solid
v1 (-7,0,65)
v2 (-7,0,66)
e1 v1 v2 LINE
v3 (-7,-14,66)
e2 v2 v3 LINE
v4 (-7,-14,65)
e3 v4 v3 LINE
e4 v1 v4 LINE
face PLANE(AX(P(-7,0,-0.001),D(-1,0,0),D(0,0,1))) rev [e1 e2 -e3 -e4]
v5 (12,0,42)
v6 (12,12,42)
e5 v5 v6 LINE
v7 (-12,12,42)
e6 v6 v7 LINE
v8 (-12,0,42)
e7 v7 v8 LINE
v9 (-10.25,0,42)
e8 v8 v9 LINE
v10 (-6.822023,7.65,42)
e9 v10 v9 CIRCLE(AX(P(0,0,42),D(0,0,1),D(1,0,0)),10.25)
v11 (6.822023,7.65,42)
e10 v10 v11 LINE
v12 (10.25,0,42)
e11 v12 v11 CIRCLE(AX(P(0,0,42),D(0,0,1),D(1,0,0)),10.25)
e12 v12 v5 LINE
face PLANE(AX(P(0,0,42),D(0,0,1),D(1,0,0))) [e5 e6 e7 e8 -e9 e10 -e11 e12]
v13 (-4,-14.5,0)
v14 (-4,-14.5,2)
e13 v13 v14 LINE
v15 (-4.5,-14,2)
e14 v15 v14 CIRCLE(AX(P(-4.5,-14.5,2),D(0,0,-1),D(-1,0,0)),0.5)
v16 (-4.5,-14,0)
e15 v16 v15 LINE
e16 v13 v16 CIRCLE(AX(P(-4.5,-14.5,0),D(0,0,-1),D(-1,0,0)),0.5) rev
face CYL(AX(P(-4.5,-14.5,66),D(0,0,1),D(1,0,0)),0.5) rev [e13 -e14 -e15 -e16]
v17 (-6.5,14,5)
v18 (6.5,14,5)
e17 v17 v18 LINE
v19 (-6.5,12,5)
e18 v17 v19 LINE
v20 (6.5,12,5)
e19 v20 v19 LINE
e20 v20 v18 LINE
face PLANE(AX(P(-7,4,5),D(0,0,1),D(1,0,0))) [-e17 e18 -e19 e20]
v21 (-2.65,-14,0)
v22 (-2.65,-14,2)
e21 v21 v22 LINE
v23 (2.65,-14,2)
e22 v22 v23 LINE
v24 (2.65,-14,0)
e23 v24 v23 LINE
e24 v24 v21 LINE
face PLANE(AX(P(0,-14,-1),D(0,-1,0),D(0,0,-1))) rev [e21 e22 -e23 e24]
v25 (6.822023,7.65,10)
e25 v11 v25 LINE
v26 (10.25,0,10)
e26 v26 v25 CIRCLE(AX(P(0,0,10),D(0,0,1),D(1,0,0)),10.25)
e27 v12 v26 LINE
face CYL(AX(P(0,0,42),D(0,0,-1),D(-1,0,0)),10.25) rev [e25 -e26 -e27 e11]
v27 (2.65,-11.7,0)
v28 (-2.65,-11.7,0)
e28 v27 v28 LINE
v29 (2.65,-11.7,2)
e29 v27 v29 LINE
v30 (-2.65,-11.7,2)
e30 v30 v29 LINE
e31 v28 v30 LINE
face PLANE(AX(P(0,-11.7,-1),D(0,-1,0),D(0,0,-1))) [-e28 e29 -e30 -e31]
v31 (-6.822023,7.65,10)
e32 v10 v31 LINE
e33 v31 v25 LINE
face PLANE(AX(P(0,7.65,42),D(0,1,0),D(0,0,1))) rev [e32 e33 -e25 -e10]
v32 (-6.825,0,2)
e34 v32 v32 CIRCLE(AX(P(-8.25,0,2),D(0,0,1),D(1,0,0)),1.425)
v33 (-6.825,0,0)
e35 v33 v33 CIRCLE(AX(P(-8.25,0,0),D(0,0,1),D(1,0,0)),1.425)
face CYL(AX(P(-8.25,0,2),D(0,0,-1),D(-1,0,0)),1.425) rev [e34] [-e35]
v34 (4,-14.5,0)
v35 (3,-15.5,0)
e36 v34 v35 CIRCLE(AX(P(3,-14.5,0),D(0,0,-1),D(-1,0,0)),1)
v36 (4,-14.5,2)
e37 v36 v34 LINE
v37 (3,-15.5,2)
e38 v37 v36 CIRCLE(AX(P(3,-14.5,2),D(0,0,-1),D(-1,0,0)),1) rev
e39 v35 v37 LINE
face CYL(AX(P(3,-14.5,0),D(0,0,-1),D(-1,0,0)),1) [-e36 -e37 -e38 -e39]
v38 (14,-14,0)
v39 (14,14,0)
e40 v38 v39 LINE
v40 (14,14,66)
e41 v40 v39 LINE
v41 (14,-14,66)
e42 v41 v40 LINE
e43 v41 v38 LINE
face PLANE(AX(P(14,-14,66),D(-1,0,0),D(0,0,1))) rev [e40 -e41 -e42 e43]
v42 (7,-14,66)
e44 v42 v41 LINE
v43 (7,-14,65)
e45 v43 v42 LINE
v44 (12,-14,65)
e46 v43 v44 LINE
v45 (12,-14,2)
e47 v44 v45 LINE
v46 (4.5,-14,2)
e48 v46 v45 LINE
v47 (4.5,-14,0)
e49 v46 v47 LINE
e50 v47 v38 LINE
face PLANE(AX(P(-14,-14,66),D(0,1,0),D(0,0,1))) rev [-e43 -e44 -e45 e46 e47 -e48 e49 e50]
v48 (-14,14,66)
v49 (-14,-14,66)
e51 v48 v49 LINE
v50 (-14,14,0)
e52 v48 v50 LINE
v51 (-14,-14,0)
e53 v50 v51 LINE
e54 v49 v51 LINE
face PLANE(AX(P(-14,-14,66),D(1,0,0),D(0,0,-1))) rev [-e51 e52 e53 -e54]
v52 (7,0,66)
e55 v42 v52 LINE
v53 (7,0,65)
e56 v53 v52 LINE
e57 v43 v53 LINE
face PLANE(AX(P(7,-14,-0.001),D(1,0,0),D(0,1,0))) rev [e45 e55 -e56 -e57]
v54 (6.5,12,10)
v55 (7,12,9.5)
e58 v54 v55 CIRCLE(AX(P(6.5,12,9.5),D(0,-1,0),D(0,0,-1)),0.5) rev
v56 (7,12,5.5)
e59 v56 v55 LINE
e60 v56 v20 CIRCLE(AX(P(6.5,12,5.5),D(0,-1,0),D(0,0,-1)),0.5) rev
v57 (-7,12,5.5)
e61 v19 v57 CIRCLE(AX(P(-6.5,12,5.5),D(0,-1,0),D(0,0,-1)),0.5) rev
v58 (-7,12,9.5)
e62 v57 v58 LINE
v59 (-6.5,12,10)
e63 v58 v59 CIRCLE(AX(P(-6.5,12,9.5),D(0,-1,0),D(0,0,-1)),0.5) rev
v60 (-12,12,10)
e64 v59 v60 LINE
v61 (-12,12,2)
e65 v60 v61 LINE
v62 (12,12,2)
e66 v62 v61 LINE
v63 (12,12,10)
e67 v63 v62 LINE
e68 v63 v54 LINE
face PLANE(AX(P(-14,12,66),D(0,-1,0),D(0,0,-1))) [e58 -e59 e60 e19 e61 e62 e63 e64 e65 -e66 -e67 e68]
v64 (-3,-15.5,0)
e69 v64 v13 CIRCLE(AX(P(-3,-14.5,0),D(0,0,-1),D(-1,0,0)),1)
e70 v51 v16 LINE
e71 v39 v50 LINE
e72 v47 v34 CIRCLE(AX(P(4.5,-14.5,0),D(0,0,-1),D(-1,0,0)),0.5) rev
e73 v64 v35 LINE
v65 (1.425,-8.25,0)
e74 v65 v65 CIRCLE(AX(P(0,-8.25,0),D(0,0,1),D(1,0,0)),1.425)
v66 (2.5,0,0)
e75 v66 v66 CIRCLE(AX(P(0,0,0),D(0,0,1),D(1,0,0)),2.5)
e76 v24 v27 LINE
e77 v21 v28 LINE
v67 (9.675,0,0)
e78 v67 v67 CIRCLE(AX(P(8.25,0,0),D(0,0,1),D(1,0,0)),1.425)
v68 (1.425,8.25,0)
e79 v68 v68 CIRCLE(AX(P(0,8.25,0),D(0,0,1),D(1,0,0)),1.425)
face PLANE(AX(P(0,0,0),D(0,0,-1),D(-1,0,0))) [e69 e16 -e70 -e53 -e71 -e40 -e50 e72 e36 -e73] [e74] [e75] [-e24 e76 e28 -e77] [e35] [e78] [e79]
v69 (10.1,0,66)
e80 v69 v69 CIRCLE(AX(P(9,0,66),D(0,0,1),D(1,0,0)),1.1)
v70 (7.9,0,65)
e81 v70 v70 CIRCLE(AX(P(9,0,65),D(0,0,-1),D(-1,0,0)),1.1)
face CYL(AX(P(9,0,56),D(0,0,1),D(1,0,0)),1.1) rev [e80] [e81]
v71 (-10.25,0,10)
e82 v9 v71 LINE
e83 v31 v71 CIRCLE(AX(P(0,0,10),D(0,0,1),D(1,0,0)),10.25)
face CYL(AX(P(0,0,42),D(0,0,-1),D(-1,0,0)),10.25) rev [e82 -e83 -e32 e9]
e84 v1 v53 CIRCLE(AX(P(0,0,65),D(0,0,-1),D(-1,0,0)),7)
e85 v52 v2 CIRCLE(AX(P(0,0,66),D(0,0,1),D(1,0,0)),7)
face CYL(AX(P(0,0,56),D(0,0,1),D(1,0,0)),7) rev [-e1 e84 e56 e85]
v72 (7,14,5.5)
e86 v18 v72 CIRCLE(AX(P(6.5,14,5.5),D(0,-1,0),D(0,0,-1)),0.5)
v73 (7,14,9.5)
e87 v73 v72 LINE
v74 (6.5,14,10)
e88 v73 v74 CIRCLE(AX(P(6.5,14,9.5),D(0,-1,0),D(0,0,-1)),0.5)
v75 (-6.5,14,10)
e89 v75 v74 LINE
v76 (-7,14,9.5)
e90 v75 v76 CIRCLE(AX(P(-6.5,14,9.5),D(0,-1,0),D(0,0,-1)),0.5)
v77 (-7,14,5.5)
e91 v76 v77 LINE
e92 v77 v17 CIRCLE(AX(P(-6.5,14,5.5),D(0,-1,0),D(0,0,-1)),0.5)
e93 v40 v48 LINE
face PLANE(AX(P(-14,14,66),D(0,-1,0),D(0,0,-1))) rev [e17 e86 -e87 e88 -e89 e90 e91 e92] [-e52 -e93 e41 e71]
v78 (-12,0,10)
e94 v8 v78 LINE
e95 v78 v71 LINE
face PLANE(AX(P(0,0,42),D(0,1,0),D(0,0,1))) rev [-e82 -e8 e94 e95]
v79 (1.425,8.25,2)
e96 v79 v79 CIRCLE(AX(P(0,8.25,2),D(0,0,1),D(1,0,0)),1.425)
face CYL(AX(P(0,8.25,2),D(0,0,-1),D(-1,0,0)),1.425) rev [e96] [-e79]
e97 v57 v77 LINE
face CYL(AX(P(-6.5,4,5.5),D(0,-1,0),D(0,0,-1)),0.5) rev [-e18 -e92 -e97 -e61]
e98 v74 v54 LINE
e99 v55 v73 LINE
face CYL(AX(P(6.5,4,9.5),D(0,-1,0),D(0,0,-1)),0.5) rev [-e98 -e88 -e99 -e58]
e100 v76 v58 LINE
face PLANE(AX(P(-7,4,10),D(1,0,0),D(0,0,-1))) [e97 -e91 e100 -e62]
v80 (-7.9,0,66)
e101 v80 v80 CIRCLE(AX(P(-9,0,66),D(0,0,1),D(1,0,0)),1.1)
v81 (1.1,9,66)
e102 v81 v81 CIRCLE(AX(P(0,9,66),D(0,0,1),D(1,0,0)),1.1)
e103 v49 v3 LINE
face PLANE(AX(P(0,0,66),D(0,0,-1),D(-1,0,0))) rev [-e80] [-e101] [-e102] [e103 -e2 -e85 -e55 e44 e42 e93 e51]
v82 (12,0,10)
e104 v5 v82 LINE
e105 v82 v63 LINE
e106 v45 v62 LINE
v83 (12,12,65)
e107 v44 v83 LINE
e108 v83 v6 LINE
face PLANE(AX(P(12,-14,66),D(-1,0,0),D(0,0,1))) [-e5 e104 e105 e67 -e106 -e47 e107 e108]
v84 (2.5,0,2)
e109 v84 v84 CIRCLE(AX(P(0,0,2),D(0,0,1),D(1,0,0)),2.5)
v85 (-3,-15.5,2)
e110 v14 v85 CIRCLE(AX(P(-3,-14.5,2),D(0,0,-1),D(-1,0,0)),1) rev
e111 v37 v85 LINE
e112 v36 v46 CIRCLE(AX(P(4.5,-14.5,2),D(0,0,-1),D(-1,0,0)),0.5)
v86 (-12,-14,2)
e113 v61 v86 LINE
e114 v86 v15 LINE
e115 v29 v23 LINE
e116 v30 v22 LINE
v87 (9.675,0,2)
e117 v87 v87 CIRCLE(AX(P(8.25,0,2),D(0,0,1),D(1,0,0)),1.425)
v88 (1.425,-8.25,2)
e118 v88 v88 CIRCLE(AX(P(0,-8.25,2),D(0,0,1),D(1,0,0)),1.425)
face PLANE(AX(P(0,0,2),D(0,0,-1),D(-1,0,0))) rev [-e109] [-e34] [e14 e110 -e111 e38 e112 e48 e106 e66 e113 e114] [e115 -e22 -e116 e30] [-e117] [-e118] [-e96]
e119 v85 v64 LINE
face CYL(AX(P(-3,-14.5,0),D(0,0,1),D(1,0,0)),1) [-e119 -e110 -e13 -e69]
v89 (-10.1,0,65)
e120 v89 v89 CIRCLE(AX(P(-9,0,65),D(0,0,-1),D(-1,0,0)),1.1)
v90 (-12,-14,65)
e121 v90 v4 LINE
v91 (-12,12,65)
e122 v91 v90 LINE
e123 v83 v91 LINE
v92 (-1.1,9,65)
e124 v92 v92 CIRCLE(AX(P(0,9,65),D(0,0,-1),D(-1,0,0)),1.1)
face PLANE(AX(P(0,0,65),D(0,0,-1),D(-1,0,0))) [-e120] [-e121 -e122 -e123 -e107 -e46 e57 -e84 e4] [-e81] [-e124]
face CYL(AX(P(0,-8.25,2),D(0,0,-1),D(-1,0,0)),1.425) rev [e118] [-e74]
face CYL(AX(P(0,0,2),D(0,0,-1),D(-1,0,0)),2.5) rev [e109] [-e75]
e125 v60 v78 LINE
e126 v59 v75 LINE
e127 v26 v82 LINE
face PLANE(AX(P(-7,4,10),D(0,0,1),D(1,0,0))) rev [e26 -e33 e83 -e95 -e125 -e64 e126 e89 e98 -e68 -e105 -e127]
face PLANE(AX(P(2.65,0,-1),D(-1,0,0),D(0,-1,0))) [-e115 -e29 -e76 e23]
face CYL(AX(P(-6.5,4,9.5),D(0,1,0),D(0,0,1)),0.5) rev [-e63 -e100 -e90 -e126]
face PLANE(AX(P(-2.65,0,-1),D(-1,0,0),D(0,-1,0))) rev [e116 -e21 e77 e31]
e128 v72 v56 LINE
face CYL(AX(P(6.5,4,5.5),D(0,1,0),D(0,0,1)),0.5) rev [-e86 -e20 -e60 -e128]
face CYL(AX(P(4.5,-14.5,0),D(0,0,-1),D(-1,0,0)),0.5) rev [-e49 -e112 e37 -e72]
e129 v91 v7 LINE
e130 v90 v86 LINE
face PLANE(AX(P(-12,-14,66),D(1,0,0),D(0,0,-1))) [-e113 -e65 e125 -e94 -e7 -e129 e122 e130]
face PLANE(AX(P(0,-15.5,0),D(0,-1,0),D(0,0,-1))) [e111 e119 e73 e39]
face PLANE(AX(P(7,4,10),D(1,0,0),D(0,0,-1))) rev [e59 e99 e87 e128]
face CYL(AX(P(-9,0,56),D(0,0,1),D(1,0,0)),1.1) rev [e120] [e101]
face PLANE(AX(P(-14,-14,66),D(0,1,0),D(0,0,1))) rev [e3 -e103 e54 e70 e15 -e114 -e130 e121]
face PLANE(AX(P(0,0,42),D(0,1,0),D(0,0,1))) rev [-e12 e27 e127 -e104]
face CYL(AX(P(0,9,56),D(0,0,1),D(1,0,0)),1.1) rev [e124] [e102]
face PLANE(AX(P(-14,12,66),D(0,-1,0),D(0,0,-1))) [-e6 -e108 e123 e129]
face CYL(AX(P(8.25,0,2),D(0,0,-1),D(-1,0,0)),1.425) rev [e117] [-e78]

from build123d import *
from OCP.BRepFilletAPI import BRepFilletAPI_MakeFillet

# Parameters (mm, degrees)
SKETCH1_W                 = 28
SKETCH1_H                 = 28
BOSS_EXTRUDE1_DEPTH       = 66
SHELL1_T                  = -2
SHELL1_THICKNESS_2_FACE_W = 24
SHELL1_THICKNESS_2_FACE_H = 26
SHELL1_THICKNESS_2_DEPTH  = 1
SKETCH2_R                 = 2.5
SKETCH2_R_2               = 1.425
CUT_EXTRUDE4_DEPTH        = 2
SKETCH5_W                 = 14
SKETCH5_H                 = 5
CUT_EXTRUDE6_DEPTH        = 10
SKETCH6_R                 = 7
SKETCH6_R_2               = 1.1
CUT_EXTRUDE8_DEPTH        = 10
FILLET1_R                 = 0.5
BOSS_EXTRUDE2_START       = 8
BOSS_EXTRUDE2_DEPTH       = 32
SKETCH16_W                = 4
SKETCH16_H                = 2
BOSS_EXTRUDE9_DEPTH       = 1.5
SKETCH17_W                = 2.65
SKETCH17_H                = 2.3
CUT_EXTRUDE9_DEPTH        = 3
FILLET3_R                 = 1
FILLET3_R_2               = 0.5
CUT_EXTRUDE10_REACH       = 71.226
SKETCH18_W                = 14
SKETCH18_H                = 14


with BuildPart() as part:
    # Sketch1 → Boss-Extrude1 (new body)
    with BuildSketch(Plane.XY):
        Rectangle(SKETCH1_W, SKETCH1_H)
    extrude(amount=BOSS_EXTRUDE1_DEPTH)

    # Shell1
    shell1_openings = [part.faces().sort_by_distance(p)[0] for p in [
        (0, -14, 33),
    ]]
    offset(amount=SHELL1_T, openings=shell1_openings, kind=Kind.INTERSECTION)

    # Shell1 thickness 2 face (on inner face of the shell) → Shell1 thickness 2 (cut)
    with BuildSketch(Plane(origin=(0, -1, 64), x_dir=(1, 0, 0), z_dir=(0, 0, 1))):
        Rectangle(SHELL1_THICKNESS_2_FACE_W, SHELL1_THICKNESS_2_FACE_H)
    extrude(amount=SHELL1_THICKNESS_2_DEPTH, mode=Mode.SUBTRACT)

    # Sketch2 → Cut-Extrude4 (cut)
    with BuildSketch(Plane.XY):
        Circle(SKETCH2_R)
        with Locations((8.25, 0)):
            Circle(SKETCH2_R_2)
        with Locations((0, -8.25)):
            Circle(SKETCH2_R_2)
        with Locations((-8.25, 0)):
            Circle(SKETCH2_R_2)
        with Locations((0, 8.25)):
            Circle(SKETCH2_R_2)
    extrude(amount=CUT_EXTRUDE4_DEPTH, mode=Mode.SUBTRACT)

    # Sketch5 → Cut-Extrude6 (cut)
    with BuildSketch(Plane(origin=(0, 14, 0), x_dir=(1, 0, 0), z_dir=(0, 1, 0))):
        with Locations((0, -7.5)):
            Rectangle(SKETCH5_W, SKETCH5_H)
    extrude(amount=-CUT_EXTRUDE6_DEPTH, mode=Mode.SUBTRACT)

    # Sketch6 → Cut-Extrude8 (cut)
    with BuildSketch(Plane.XY.offset(66)):
        Circle(SKETCH6_R)
        with Locations((0, 9)):
            Circle(SKETCH6_R_2)
        with Locations((9, 0)):
            Circle(SKETCH6_R_2)
        with Locations((0, -9)):
            Circle(SKETCH6_R_2)
        with Locations((-9, 0)):
            Circle(SKETCH6_R_2)
    extrude(amount=-CUT_EXTRUDE8_DEPTH, mode=Mode.SUBTRACT)

    # Fillet1
    fillet1_edges = [part.edges().sort_by_distance(p)[0] for p in [
        (-7, 13, 5),
        (7, 13, 5),
        (7, 13, 10),
        (-7, 13, 10),
    ]]
    fillet(fillet1_edges, radius=FILLET1_R)

    # Sketch9 → Boss-Extrude2 (add)
    with BuildSketch(Plane.XY.offset(2).offset(BOSS_EXTRUDE2_START)):
        with BuildLine():
            ThreePointArc((6.82202316, 7.65), (9.353829093, 4.191465293), (10.25, 0))
            Line((10.25, 0), (12, 0))
            Line((12, 0), (12, 12))
            Line((12, 12), (-12, 12))
            Line((-12, 12), (-12, 0))
            Line((-12, 0), (-10.25, 0))
            ThreePointArc((-10.25, 0), (-9.353829093, 4.191465293), (-6.82202316, 7.65))
            ThreePointArc((-6.82202316, 7.65), (0, 10.25), (6.82202316, 7.65))
        make_face()
        with BuildLine():
            Line((-6.82202316, 7.65), (-1.292526595, 7.65))
            ThreePointArc((-1.292526595, 7.65), (-0.307225163, 9.641487585), (1.425, 8.25))
            ThreePointArc((1.425, 8.25), (1.391487585, 7.942774837), (1.292526595, 7.65))
            Line((1.292526595, 7.65), (6.82202316, 7.65))
            ThreePointArc((6.82202316, 7.65), (0, 10.25), (-6.82202316, 7.65))
        make_face()
        with BuildLine():
            Line((-1.292526595, 7.65), (0, 7.65))
            Line((0, 7.65), (1.292526595, 7.65))
            ThreePointArc((1.292526595, 7.65), (1.391487585, 7.942774837), (1.425, 8.25))
            ThreePointArc((1.425, 8.25), (-0.307225163, 9.641487585), (-1.292526595, 7.65))
        make_face()
    extrude(amount=BOSS_EXTRUDE2_DEPTH)

    # Sketch16 → Boss-Extrude9 (add)
    with BuildSketch(Plane.XZ.offset(14)):
        with Locations((-2, 1)):
            Rectangle(SKETCH16_W, SKETCH16_H)
        with Locations((2, 1)):
            Rectangle(SKETCH16_W, SKETCH16_H)
    extrude(amount=BOSS_EXTRUDE9_DEPTH)

    # Sketch17 → Cut-Extrude9 (cut)
    with BuildSketch(Plane.XY.offset(2)):
        with Locations((1.325, -12.85)):
            Rectangle(SKETCH17_W, SKETCH17_H)
        with Locations((-1.325, -12.85)):
            Rectangle(SKETCH17_W, SKETCH17_H)
    extrude(amount=-CUT_EXTRUDE9_DEPTH, mode=Mode.SUBTRACT)

    # Fillet3
    fillet3_edges_1 = [part.edges().sort_by_distance(p)[0] for p in [
        (-4, -15.5, 1),
        (4, -15.5, 1),
    ]]
    fillet3_edges_2 = [part.edges().sort_by_distance(p)[0] for p in [
        (4, -14, 1),
        (-4, -14, 1),
    ]]
    fillet3 = BRepFilletAPI_MakeFillet(part.part.solid().wrapped)
    for e in fillet3_edges_1:
        fillet3.Add(FILLET3_R - 0.0001, e.wrapped)
    for e in fillet3_edges_2:
        fillet3.Add(FILLET3_R_2 - 0.0001, e.wrapped)
    add(Compound.cast(fillet3.Shape()), mode=Mode.REPLACE)  # a hair under: the kernel refuses the full size

    # Sketch18 → Cut-Extrude10 (cut, up to next)
    with BuildSketch(Plane.XY.offset(66), mode=Mode.PRIVATE) as cut_extrude10_sk1:
        with Locations((0, -7)):
            Rectangle(SKETCH18_W, SKETCH18_H)
    cut_extrude10_tool1 = extrude(cut_extrude10_sk1.sketch, amount=-CUT_EXTRUDE10_REACH, mode=Mode.PRIVATE) & part.part
    add(cut_extrude10_tool1.solids().sort_by_distance((0, -7, 66))[0], mode=Mode.SUBTRACT)


solid = part.part
